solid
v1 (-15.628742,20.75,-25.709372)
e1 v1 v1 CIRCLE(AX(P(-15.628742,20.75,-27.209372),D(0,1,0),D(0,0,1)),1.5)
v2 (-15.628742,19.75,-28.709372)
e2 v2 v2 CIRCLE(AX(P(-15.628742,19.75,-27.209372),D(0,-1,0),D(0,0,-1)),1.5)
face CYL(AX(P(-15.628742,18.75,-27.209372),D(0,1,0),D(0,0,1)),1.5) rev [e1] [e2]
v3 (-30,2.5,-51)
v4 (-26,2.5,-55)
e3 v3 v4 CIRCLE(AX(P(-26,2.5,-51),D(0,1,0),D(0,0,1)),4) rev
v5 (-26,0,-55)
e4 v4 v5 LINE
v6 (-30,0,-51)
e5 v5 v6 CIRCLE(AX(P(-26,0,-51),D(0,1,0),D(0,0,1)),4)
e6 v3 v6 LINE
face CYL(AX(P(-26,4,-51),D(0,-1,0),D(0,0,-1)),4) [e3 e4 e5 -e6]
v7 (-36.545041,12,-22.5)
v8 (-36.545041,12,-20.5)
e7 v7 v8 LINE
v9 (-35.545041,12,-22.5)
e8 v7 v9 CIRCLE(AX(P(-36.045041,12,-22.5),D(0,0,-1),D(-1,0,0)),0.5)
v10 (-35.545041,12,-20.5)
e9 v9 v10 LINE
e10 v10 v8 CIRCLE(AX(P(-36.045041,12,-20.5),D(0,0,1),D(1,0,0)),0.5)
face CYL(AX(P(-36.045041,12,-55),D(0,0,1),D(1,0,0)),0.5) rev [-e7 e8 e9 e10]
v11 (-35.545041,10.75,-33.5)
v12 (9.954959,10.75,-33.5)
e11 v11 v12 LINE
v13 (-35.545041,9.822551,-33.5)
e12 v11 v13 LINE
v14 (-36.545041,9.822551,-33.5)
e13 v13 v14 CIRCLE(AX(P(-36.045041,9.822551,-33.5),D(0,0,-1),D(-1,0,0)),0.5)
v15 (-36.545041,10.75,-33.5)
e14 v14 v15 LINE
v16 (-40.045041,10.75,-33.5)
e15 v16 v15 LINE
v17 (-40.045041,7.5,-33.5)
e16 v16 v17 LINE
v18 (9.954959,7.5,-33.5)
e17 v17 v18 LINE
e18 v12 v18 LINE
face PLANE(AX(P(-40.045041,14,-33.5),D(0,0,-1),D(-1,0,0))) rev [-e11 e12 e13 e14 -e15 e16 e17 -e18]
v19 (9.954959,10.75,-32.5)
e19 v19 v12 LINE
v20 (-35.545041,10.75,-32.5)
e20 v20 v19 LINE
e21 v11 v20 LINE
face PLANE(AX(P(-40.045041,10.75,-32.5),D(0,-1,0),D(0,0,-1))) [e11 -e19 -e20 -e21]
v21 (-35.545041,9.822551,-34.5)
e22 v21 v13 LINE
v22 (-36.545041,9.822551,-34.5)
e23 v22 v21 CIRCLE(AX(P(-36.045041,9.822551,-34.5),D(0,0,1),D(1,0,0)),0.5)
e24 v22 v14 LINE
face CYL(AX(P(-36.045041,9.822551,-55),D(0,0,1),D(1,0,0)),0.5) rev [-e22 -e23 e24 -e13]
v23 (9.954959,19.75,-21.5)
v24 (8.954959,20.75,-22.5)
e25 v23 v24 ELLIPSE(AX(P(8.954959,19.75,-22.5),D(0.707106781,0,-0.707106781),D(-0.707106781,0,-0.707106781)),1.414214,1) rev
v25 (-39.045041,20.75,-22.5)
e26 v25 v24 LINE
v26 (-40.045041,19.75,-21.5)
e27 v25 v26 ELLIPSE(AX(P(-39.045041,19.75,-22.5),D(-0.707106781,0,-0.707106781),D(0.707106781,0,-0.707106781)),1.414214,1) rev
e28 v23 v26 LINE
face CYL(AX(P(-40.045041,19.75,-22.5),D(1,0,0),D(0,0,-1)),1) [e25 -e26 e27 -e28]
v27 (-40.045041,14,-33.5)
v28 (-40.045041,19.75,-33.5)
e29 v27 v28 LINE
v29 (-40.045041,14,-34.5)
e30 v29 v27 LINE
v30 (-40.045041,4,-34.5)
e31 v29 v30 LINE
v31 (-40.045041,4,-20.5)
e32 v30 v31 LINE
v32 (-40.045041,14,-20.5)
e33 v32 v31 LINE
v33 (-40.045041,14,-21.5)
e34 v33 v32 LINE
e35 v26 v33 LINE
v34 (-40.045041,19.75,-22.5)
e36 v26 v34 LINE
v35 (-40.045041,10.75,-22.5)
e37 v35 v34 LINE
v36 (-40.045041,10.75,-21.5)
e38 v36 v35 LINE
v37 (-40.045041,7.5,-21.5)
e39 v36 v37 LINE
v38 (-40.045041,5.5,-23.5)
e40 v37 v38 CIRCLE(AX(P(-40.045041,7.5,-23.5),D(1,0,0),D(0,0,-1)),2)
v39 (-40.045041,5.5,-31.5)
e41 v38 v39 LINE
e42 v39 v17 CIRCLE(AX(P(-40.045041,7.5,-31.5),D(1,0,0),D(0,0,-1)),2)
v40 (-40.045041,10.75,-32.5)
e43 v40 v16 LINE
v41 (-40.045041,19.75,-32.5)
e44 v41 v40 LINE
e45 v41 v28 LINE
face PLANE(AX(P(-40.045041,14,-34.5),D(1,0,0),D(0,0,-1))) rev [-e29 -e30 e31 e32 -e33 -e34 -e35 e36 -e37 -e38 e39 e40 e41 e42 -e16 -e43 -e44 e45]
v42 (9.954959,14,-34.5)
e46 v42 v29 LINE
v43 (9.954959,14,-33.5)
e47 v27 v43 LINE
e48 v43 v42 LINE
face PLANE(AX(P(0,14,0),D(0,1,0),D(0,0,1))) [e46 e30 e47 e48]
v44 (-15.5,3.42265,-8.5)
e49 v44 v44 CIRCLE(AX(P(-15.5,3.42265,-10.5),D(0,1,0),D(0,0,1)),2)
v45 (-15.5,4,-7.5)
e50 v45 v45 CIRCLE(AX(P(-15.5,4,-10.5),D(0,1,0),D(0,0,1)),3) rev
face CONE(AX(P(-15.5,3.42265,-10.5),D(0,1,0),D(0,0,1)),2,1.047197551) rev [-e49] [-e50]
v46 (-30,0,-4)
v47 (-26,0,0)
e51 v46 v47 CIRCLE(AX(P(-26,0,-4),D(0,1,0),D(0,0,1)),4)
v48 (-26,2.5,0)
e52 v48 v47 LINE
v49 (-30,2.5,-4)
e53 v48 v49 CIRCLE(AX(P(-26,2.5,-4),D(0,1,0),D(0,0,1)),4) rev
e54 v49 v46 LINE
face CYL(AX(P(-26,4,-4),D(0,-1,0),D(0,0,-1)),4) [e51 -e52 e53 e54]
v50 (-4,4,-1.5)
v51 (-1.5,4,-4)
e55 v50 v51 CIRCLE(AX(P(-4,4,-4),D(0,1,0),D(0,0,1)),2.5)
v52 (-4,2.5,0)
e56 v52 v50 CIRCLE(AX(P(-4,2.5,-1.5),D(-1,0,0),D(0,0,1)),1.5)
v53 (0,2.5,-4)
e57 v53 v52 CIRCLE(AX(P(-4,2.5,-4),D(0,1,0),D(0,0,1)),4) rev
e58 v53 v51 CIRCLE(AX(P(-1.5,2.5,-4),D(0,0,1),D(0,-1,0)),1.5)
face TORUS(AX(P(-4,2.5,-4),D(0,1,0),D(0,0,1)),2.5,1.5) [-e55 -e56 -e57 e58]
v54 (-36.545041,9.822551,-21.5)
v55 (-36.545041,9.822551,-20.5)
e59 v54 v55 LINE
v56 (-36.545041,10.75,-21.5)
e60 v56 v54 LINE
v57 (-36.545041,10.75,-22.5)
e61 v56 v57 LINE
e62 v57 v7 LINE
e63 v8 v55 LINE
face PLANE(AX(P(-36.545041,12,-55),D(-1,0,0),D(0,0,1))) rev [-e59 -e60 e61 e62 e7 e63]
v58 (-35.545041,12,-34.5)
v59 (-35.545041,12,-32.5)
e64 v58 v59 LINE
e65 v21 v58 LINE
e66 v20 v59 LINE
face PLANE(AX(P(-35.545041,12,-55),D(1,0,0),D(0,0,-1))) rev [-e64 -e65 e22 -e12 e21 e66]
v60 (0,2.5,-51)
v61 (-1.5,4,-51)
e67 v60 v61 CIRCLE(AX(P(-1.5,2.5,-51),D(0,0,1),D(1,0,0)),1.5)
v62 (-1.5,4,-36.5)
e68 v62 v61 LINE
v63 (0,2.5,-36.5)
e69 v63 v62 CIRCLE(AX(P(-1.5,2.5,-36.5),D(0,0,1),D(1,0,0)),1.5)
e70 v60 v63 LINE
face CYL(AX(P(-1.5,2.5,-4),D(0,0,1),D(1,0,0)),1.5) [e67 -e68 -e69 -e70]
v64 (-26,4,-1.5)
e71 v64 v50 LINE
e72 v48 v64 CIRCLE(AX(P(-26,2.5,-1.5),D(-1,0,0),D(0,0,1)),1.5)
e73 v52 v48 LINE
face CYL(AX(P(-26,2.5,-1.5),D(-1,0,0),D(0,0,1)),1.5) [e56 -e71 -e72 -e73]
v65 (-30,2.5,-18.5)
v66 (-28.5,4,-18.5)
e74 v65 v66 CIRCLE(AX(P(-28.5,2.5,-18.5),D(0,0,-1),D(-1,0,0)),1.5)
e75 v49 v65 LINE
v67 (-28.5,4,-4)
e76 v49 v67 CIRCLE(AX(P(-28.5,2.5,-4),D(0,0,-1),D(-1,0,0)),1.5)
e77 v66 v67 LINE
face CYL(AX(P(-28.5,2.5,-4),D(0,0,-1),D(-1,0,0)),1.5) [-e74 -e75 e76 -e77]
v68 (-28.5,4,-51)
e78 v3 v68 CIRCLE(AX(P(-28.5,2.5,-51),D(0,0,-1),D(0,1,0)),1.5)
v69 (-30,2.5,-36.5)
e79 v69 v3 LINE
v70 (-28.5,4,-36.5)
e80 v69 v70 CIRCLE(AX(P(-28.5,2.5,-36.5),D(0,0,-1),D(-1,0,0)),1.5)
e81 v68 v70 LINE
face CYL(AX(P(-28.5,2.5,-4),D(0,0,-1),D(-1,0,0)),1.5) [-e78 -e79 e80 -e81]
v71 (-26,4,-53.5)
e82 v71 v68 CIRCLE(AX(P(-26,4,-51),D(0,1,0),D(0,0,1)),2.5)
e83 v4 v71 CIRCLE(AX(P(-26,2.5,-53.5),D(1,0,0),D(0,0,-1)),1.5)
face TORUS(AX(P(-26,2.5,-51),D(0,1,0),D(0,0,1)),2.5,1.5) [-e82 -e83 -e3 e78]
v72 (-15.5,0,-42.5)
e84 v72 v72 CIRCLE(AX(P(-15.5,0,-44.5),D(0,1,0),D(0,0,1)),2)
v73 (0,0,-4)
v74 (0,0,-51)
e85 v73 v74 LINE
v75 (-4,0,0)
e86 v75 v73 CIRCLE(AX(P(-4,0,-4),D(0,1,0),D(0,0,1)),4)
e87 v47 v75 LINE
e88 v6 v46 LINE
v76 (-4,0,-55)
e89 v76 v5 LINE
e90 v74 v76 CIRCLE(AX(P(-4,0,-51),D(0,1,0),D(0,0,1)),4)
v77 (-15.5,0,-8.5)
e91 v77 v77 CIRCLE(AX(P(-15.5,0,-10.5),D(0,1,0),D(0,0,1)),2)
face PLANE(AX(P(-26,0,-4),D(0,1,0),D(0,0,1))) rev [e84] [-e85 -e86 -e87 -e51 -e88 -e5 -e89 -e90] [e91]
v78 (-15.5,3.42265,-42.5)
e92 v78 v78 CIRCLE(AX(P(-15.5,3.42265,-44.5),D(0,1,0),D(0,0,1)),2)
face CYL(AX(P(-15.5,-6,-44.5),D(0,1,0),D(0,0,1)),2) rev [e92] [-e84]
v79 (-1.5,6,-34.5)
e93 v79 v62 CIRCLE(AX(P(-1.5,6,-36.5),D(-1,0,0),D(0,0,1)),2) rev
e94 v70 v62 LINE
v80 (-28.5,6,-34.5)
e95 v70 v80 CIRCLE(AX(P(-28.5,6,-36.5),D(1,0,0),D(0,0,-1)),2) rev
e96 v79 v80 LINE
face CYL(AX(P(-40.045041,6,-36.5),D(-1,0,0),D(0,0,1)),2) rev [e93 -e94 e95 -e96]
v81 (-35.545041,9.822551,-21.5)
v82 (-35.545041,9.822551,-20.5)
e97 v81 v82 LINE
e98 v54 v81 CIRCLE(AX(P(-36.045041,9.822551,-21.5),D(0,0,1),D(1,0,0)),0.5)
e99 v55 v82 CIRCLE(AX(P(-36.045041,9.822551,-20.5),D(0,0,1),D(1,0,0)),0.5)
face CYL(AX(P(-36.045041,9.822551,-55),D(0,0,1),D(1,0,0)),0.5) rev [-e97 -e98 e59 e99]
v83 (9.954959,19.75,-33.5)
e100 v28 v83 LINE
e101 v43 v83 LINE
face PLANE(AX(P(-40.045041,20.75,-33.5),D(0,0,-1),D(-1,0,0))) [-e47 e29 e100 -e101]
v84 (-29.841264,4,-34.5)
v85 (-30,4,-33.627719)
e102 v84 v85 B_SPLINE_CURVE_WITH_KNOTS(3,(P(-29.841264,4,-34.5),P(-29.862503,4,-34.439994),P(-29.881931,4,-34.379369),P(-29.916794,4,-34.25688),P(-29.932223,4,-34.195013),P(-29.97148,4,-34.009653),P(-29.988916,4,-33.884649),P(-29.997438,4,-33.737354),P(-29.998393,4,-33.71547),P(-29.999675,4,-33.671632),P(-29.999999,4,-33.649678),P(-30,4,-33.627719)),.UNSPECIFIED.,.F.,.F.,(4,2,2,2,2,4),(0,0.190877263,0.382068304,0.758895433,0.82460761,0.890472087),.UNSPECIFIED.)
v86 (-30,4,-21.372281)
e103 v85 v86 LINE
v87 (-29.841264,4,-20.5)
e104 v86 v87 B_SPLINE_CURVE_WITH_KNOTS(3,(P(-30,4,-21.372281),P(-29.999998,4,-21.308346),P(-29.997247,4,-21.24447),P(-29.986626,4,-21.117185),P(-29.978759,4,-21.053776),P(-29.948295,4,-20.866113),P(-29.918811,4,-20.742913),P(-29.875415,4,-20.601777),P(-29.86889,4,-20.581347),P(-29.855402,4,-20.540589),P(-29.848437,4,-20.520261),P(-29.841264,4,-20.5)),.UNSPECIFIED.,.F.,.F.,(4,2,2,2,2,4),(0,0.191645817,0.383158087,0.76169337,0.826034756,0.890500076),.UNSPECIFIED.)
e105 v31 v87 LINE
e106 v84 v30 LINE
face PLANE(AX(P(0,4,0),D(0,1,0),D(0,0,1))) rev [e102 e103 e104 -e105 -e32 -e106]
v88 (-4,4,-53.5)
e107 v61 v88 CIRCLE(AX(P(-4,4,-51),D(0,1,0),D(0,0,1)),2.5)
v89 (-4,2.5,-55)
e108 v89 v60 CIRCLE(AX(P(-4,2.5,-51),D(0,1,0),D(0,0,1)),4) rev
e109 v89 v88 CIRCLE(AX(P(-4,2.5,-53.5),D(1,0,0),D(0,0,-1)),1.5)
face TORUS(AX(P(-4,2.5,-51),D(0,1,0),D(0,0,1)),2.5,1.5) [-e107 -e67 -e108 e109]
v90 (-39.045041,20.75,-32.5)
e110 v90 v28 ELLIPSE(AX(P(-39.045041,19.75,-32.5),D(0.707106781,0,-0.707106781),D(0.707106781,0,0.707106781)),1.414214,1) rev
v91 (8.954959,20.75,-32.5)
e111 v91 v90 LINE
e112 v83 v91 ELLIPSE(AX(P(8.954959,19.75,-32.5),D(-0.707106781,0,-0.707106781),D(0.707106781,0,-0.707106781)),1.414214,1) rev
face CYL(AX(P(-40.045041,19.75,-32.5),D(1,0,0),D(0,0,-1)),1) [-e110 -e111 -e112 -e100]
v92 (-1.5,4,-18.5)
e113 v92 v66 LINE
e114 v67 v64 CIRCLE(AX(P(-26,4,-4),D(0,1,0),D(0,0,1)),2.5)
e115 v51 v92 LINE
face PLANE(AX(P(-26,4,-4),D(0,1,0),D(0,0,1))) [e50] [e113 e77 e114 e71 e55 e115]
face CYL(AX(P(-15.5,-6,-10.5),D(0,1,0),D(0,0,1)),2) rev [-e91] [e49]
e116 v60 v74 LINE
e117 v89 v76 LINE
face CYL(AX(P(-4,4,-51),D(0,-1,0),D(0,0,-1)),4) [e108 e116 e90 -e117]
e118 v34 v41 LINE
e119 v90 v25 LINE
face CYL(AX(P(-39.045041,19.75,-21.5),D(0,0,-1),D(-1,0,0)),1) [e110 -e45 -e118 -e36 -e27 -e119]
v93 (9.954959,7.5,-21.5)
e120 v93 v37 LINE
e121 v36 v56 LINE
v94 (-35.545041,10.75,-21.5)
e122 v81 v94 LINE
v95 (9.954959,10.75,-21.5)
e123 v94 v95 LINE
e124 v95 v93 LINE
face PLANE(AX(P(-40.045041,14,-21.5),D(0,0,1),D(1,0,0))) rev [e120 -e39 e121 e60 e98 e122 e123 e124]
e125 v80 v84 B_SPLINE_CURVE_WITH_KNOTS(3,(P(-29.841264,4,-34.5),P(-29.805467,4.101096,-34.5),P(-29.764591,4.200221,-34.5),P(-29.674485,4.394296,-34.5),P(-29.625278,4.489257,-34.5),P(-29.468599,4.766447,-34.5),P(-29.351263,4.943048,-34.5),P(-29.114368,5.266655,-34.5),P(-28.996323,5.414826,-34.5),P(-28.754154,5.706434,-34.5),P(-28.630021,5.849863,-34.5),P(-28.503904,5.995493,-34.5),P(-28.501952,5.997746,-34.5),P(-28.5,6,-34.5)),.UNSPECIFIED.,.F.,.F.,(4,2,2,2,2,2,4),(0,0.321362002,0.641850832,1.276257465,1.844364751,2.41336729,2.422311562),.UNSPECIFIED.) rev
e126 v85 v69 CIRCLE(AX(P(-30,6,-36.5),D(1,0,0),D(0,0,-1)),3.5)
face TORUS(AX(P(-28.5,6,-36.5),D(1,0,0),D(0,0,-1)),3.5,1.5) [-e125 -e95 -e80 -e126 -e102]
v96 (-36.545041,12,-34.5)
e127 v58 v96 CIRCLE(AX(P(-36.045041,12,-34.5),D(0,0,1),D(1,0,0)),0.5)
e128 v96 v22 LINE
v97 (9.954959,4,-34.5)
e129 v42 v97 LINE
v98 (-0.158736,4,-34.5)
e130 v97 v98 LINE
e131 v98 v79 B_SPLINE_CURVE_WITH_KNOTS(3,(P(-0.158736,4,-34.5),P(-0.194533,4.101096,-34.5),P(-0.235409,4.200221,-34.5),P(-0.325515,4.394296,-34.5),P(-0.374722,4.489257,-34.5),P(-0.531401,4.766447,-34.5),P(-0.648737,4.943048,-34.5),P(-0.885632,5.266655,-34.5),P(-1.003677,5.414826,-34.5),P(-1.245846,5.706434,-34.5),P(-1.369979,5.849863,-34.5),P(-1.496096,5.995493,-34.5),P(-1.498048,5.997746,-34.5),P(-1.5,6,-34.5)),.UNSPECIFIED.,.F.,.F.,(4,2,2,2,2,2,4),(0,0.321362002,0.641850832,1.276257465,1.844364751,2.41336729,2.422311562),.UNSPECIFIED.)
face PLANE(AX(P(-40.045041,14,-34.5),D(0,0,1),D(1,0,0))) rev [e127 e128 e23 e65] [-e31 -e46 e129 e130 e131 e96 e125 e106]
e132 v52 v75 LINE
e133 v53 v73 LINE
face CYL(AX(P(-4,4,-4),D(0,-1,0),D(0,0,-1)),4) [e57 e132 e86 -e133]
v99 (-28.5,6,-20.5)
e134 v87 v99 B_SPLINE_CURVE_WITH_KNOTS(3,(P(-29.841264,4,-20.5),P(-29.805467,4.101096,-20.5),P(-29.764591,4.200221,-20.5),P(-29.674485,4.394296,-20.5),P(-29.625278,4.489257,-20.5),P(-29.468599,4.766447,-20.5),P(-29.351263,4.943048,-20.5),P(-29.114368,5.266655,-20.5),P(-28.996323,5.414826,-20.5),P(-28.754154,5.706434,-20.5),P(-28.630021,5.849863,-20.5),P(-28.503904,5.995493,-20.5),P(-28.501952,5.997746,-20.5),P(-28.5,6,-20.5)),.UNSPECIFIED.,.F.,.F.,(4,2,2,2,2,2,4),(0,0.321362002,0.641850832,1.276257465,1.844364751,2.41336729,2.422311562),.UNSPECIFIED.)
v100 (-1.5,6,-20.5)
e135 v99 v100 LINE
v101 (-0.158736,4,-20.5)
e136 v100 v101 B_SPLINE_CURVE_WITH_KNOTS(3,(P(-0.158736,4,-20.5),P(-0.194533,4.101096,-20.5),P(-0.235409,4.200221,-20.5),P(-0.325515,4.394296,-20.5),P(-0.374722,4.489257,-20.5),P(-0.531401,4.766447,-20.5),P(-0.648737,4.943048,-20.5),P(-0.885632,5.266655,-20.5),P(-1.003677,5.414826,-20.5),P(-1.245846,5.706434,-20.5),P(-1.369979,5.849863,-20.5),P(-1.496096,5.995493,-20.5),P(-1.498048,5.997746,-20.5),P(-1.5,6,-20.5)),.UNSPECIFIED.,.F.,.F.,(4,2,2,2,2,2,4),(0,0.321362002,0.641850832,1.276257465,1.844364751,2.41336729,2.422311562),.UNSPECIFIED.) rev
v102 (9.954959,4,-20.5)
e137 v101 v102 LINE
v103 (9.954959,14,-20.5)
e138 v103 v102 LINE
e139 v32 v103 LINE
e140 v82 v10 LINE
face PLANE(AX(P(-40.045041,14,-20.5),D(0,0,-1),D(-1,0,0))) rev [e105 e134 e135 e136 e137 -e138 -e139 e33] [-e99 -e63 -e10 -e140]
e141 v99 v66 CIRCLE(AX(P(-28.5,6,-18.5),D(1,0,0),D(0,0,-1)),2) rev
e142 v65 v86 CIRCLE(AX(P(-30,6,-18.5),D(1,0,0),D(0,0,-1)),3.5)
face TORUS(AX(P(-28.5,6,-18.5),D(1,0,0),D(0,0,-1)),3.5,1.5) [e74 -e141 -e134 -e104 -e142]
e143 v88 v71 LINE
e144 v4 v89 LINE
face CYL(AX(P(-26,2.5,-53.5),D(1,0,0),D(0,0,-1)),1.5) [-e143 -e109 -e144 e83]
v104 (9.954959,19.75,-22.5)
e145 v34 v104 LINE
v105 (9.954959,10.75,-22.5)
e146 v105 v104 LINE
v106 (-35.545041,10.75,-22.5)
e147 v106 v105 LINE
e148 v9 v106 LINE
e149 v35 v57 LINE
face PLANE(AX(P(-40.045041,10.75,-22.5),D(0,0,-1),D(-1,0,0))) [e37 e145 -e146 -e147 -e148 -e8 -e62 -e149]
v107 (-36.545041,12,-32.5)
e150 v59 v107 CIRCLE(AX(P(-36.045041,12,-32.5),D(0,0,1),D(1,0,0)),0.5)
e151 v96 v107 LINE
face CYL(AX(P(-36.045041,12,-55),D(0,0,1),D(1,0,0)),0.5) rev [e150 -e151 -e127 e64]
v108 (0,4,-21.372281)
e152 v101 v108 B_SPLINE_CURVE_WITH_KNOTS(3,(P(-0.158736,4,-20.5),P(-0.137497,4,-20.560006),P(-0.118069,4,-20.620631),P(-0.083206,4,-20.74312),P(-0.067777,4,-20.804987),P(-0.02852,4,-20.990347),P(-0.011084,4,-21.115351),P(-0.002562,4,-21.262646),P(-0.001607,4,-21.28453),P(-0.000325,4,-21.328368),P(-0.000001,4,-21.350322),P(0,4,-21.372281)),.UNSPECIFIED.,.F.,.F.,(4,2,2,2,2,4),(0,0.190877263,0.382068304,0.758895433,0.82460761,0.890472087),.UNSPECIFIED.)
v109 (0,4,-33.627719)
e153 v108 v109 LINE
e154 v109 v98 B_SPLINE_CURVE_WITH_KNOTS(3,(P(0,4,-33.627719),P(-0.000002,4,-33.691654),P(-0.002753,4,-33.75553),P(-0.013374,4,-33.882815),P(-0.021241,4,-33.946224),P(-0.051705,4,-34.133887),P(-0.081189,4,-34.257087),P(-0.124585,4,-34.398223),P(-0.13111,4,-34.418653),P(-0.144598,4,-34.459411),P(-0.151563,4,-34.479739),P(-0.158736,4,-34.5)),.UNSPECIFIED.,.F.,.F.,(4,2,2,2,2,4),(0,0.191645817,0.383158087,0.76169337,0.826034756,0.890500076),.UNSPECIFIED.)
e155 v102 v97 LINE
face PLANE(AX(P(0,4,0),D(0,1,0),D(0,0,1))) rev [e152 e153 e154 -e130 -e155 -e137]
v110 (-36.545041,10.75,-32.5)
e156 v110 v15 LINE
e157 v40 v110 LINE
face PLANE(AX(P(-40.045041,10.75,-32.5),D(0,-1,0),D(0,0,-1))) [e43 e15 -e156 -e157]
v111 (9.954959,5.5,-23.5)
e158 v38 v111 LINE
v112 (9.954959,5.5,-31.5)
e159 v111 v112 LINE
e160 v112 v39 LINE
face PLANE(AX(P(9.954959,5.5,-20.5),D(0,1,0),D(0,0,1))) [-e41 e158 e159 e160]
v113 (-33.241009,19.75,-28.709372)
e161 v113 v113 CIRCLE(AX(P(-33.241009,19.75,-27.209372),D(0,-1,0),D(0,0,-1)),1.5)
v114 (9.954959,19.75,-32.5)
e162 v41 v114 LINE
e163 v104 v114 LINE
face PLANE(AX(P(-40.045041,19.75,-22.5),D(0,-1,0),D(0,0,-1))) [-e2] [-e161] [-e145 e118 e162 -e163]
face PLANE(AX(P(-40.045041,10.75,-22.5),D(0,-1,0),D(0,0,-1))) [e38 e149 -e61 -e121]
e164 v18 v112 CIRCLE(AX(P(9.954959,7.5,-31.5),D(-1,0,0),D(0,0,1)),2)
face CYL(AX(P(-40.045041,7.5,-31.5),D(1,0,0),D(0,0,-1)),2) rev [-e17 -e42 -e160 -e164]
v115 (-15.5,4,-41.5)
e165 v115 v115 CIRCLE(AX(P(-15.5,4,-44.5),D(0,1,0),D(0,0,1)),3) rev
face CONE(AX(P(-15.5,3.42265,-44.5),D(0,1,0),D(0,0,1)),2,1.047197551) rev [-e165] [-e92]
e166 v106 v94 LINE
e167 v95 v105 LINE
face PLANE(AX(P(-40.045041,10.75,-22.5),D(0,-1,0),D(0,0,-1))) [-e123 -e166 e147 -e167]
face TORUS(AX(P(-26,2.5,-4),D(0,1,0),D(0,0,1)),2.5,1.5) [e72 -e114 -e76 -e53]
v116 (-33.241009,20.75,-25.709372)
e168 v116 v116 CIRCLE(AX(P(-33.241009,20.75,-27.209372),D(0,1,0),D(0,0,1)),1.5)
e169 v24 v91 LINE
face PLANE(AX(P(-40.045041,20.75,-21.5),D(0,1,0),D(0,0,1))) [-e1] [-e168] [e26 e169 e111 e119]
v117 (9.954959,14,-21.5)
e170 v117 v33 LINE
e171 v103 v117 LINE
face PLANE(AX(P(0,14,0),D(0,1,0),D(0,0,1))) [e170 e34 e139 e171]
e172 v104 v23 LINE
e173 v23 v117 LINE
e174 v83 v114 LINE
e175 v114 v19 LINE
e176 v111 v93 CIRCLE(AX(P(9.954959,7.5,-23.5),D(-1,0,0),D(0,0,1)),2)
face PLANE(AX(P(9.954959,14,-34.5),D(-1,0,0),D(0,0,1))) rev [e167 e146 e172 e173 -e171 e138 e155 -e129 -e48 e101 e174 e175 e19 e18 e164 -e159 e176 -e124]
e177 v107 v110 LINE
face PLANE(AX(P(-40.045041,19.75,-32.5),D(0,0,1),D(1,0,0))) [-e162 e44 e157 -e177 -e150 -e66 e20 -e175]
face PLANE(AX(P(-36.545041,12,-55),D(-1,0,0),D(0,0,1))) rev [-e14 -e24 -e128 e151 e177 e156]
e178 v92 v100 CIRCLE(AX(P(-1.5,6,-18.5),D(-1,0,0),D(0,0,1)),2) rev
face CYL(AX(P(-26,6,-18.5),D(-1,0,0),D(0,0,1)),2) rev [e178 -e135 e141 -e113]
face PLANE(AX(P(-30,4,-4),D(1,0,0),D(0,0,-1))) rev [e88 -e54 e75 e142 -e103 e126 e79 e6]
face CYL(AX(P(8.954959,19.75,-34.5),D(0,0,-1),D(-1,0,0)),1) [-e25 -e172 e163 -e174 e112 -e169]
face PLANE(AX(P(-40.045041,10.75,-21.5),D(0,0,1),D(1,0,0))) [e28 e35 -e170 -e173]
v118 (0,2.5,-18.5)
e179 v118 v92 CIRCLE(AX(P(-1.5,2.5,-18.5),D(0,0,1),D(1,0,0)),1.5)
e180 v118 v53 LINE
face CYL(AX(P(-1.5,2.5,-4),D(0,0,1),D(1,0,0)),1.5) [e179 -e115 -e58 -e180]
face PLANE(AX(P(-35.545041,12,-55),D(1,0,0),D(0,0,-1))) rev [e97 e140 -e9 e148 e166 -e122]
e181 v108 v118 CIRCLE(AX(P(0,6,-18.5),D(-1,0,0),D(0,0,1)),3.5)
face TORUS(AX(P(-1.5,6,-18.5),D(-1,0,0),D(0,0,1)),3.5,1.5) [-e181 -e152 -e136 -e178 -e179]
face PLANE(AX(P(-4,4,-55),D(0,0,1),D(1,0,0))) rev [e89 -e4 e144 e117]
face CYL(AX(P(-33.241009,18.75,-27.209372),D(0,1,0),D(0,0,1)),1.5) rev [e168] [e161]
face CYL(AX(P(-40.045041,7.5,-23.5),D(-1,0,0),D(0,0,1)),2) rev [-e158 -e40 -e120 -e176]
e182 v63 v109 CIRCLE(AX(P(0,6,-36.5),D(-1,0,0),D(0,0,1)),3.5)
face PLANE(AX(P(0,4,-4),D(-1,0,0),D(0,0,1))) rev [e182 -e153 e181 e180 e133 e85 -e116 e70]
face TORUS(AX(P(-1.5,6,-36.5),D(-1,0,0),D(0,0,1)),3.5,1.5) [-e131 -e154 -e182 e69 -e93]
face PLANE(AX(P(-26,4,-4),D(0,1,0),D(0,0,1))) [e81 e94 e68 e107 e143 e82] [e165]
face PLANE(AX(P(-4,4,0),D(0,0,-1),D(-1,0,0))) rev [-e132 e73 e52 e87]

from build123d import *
from OCP.BRepFilletAPI import BRepFilletAPI_MakeChamfer

# Parameters (mm, degrees)
BOSS_EXTRUDE1_DEPTH = 4
SKETCH3_W           = 50
SKETCH3_H           = 1
BOSS_EXTRUDE2_DEPTH = 10
BOSS_EXTRUDE3_START = -13
SKETCH4_W           = 50
SKETCH4_H           = 1.5
BOSS_EXTRUDE3_DEPTH = 12
FILLET1_R           = 2
FILLET2_R           = 2
FILLET3_R           = 2
FILLET4_R           = 1.5
BOSS_EXTRUDE4_DEPTH = 50
FILLET6_START       = -40.045040573
FILLET6_DEPTH       = 50
FILLET6_START_2     = -34.5
FILLET6_2_DEPTH     = 14
SKETCH6_R           = 1.5
CUT_EXTRUDE1_DEPTH  = 2
SKETCH8_R           = 2
CUT_EXTRUDE2_DEPTH  = 10
CHAMFER1_SIZE       = 1
CHAMFER1_SIZE2      = 0.577350269
CUT_EXTRUDE3_DEPTH  = 57.783957087


with BuildPart() as part:
    # Sketch1 → Boss-Extrude1 (new body)
    with BuildSketch(Plane(origin=(0, 0, 0), x_dir=(1, 0, 0), z_dir=(0, 1, 0))):
        with BuildLine():
            Line((-4, 0), (-26, 0))
            ThreePointArc((-26, 0), (-28.828427125, 1.171572875), (-30, 4))
            Line((-30, 4), (-30, 51))
            ThreePointArc((-30, 51), (-28.828427125, 53.828427125), (-26, 55))
            Line((-26, 55), (-4, 55))
            ThreePointArc((-4, 55), (-1.171572875, 53.828427125), (0, 51))
            Line((0, 51), (0, 4))
            ThreePointArc((0, 4), (-1.171572875, 1.171572875), (-4, 0))
        make_face()
    extrude(amount=BOSS_EXTRUDE1_DEPTH)

    # Sketch3 → Boss-Extrude2 (add)
    with BuildSketch(Plane(origin=(0, 4, 0), x_dir=(1, 0, 0), z_dir=(0, 1, 0))):
        with Locations((-15.045040573, 21)):
            Rectangle(SKETCH3_W, SKETCH3_H)
        with Locations((-15.045040573, 34)):
            Rectangle(SKETCH3_W, SKETCH3_H)
    extrude(amount=BOSS_EXTRUDE2_DEPTH)

    # Sketch4 → Boss-Extrude3 (add)
    with BuildSketch(Plane(origin=(0, 0, -34.5), x_dir=(-1, 0, 0), z_dir=(0, 0, -1)).offset(BOSS_EXTRUDE3_START)):
        with Locations((15.045040573, 4.75)):
            Rectangle(SKETCH4_W, SKETCH4_H)
    extrude(amount=BOSS_EXTRUDE3_DEPTH)

    # Fillet1
    fillet1_edges = [part.edges().sort_by_distance(p)[0] for p in [
        (-15, 4, -20.5),
    ]]
    fillet(fillet1_edges, radius=FILLET1_R)

    # Fillet2
    fillet2_edges = [part.edges().sort_by_distance(p)[0] for p in [
        (-15, 4, -34.5),
    ]]
    fillet(fillet2_edges, radius=FILLET2_R)

    # Fillet3
    fillet3_edges = [part.edges().sort_by_distance(p)[0] for p in [
        (-15.045040573, 5.5, -33.5),
        (-15.045040573, 5.5, -21.5),
    ]]
    fillet(fillet3_edges, radius=FILLET3_R)

    # Fillet4
    # the kernel refuses this fillet: 1.5 mm, written as the material it takes off along each edge
    with BuildSketch(Plane(origin=(0, 6, -36.5), x_dir=(0, -1, 0), z_dir=(0, 0, -1))) as fillet4_piece_1_section:
        with BuildLine():
            CenterArc((2 + FILLET4_R, FILLET4_R), FILLET4_R, 180, 90)
            Line((2 + FILLET4_R, 0), (2, 0))
            Line((2, 0), (2, FILLET4_R))
        make_face()
    fillet4_piece_1 = revolve(axis=Axis((0, 6, -36.5), (-1, 0, 0)), revolution_arc=197.472741928, mode=Mode.PRIVATE)
    fillet4_piece_1 = split(fillet4_piece_1, bisect_by=Plane(origin=(0, 6, -34.5), z_dir=(0, 0, -1)), keep=Keep.TOP, mode=Mode.PRIVATE)
    add(fillet4_piece_1, mode=Mode.SUBTRACT)
    with BuildSketch(Plane(origin=(0, 6, -36.5), x_dir=(0, -1, 0), z_dir=(0, 0, -1))) as fillet4_piece_2_section:
        with BuildLine():
            CenterArc((2 + FILLET4_R, FILLET4_R), FILLET4_R, 180, 90)
            Line((2 + FILLET4_R, 0), (2, 0))
            Line((2, 0), (2, FILLET4_R))
        make_face()
    fillet4_piece_2 = revolve(axis=Axis((0, 6, -36.5), (-1, 0, 0)), revolution_arc=197.472741928, mode=Mode.PRIVATE)
    fillet4_piece_2 = split(fillet4_piece_2, bisect_by=Plane(origin=(0, 4, -36.5), z_dir=(0, -1, 0)), keep=Keep.TOP, mode=Mode.PRIVATE)
    add(fillet4_piece_2, mode=Mode.SUBTRACT)
    with BuildSketch(Plane(origin=(-30, 6, -36.5), x_dir=(0, -1, 0), z_dir=(0, 0, -1))) as fillet4_piece_3_section:
        with BuildLine():
            CenterArc((2 + FILLET4_R, -FILLET4_R), FILLET4_R, 90, 90)
            Line((2, -FILLET4_R), (2, 0))
            Line((2, 0), (2 + FILLET4_R, 0))
        make_face()
    fillet4_piece_3 = revolve(axis=Axis((-30, 6, -36.5), (-1, 0, 0)), revolution_arc=197.472741928, mode=Mode.PRIVATE)
    fillet4_piece_3 = split(fillet4_piece_3, bisect_by=Plane(origin=(-30, 4, -36.5), z_dir=(0, -1, 0)), keep=Keep.TOP, mode=Mode.PRIVATE)
    add(fillet4_piece_3, mode=Mode.SUBTRACT)
    with BuildSketch(Plane(origin=(-30, 6, -36.5), x_dir=(0, -1, 0), z_dir=(0, 0, -1))) as fillet4_piece_4_section:
        with BuildLine():
            CenterArc((2 + FILLET4_R, -FILLET4_R), FILLET4_R, 90, 90)
            Line((2, -FILLET4_R), (2, 0))
            Line((2, 0), (2 + FILLET4_R, 0))
        make_face()
    fillet4_piece_4 = revolve(axis=Axis((-30, 6, -36.5), (-1, 0, 0)), revolution_arc=197.472741928, mode=Mode.PRIVATE)
    fillet4_piece_4 = split(fillet4_piece_4, bisect_by=Plane(origin=(-30, 6, -34.5), z_dir=(0, 0, -1)), keep=Keep.TOP, mode=Mode.PRIVATE)
    add(fillet4_piece_4, mode=Mode.SUBTRACT)
    with BuildSketch(Plane(origin=(-30, 6, -18.5), x_dir=(0, 0.9538599015249878, 0.30025204122993193), z_dir=(0, -0.30025204122993193, 0.9538599015249878))) as fillet4_piece_5_section:
        with BuildLine():
            CenterArc((2 + FILLET4_R, -FILLET4_R), FILLET4_R, 90, 90)
            Line((2, -FILLET4_R), (2, 0))
            Line((2, 0), (2 + FILLET4_R, 0))
        make_face()
    fillet4_piece_5 = revolve(axis=Axis((-30, 6, -18.5), (-1, 0, 0)), revolution_arc=197.472741928, mode=Mode.PRIVATE)
    fillet4_piece_5 = split(fillet4_piece_5, bisect_by=Plane(origin=(-30, 6, -20.5), z_dir=(0, 0, 1)), keep=Keep.TOP, mode=Mode.PRIVATE)
    add(fillet4_piece_5, mode=Mode.SUBTRACT)
    with BuildSketch(Plane(origin=(-30, 6, -18.5), x_dir=(0, 0.9538599015249878, 0.30025204122993193), z_dir=(0, -0.30025204122993193, 0.9538599015249878))) as fillet4_piece_6_section:
        with BuildLine():
            CenterArc((2 + FILLET4_R, -FILLET4_R), FILLET4_R, 90, 90)
            Line((2, -FILLET4_R), (2, 0))
            Line((2, 0), (2 + FILLET4_R, 0))
        make_face()
    fillet4_piece_6 = revolve(axis=Axis((-30, 6, -18.5), (-1, 0, 0)), revolution_arc=197.472741928, mode=Mode.PRIVATE)
    fillet4_piece_6 = split(fillet4_piece_6, bisect_by=Plane(origin=(-30, 4, -18.5), z_dir=(0, -1, 0)), keep=Keep.TOP, mode=Mode.PRIVATE)
    add(fillet4_piece_6, mode=Mode.SUBTRACT)
    with BuildSketch(Plane(origin=(0, 6, -18.5), x_dir=(0, 0.9538599015249878, 0.3002520412299318), z_dir=(0, -0.3002520412299318, 0.9538599015249878))) as fillet4_piece_7_section:
        with BuildLine():
            CenterArc((2 + FILLET4_R, FILLET4_R), FILLET4_R, 180, 90)
            Line((2, FILLET4_R), (2, 0))
            Line((2, 0), (2 + FILLET4_R, 0))
        make_face()
    fillet4_piece_7 = revolve(axis=Axis((0, 6, -18.5), (-1, 0, 0)), revolution_arc=197.472741928, mode=Mode.PRIVATE)
    fillet4_piece_7 = split(fillet4_piece_7, bisect_by=Plane(origin=(0, 6, -20.5), z_dir=(0, 0, 1)), keep=Keep.TOP, mode=Mode.PRIVATE)
    add(fillet4_piece_7, mode=Mode.SUBTRACT)
    with BuildSketch(Plane(origin=(0, 6, -18.5), x_dir=(0, 0.9538599015249878, 0.3002520412299318), z_dir=(0, -0.3002520412299318, 0.9538599015249878))) as fillet4_piece_8_section:
        with BuildLine():
            CenterArc((2 + FILLET4_R, FILLET4_R), FILLET4_R, 180, 90)
            Line((2, FILLET4_R), (2, 0))
            Line((2, 0), (2 + FILLET4_R, 0))
        make_face()
    fillet4_piece_8 = revolve(axis=Axis((0, 6, -18.5), (-1, 0, 0)), revolution_arc=197.472741928, mode=Mode.PRIVATE)
    fillet4_piece_8 = split(fillet4_piece_8, bisect_by=Plane(origin=(0, 4, -18.5), z_dir=(0, -1, 0)), keep=Keep.TOP, mode=Mode.PRIVATE)
    add(fillet4_piece_8, mode=Mode.SUBTRACT)
    with BuildSketch(Plane(origin=(-26, 4, -51), x_dir=(-1, 0, 0), z_dir=(0, 0, 1))) as fillet4_piece_9:
        with BuildLine():
            CenterArc((4 - FILLET4_R, FILLET4_R), FILLET4_R, 270, 90)
            Line((4, FILLET4_R), (4, 0))
            Line((4, 0), (4 - FILLET4_R, 0))
        make_face()
    revolve(axis=Axis((-26, 4, -51), (0, -1, 0)), revolution_arc=90, mode=Mode.SUBTRACT)
    with BuildSketch(Plane(origin=(-26, 4, -55), x_dir=(0, 0, 1), z_dir=(1, 0, 0)), Plane(origin=(-4, 4, 0), x_dir=(0, 0, -1), z_dir=(-1, 0, 0))) as fillet4_piece_10:
        with BuildLine():
            CenterArc((FILLET4_R, FILLET4_R), FILLET4_R, 180, 90)
            Line((0, FILLET4_R), (0, 0))
            Line((0, 0), (FILLET4_R, 0))
        make_face()
    extrude(amount=22, mode=Mode.SUBTRACT)
    with BuildSketch(Plane(origin=(-4, 4, -51), x_dir=(0, 0, -1), z_dir=(-1, 0, 0))) as fillet4_piece_11:
        with BuildLine():
            CenterArc((4 - FILLET4_R, FILLET4_R), FILLET4_R, 270, 90)
            Line((4, FILLET4_R), (4, 0))
            Line((4, 0), (4 - FILLET4_R, 0))
        make_face()
    revolve(axis=Axis((-4, 4, -51), (0, -1, 0)), revolution_arc=90, mode=Mode.SUBTRACT)
    with BuildSketch(Plane(origin=(0, 4, -51), x_dir=(0, -1, 0), z_dir=(0, 0, 1)), Plane(origin=(-30, 4, -36.5), x_dir=(0, -1, 0), z_dir=(0, 0, -1)), Plane(origin=(-30, 4, -4), x_dir=(0, -1, 0), z_dir=(0, 0, -1)), Plane(origin=(0, 4, -18.5), x_dir=(0, -1, 0), z_dir=(0, 0, 1))) as fillet4_piece_12:
        with BuildLine():
            CenterArc((FILLET4_R, -FILLET4_R), FILLET4_R, 90, 90)
            Line((0, -FILLET4_R), (0, 0))
            Line((0, 0), (FILLET4_R, 0))
        make_face()
    extrude(amount=14.5, mode=Mode.SUBTRACT)
    with BuildSketch(Plane(origin=(-4, 4, -4), x_dir=(1, 0, 0), z_dir=(0, 0, -1))) as fillet4_piece_13:
        with BuildLine():
            CenterArc((4 - FILLET4_R, FILLET4_R), FILLET4_R, 270, 90)
            Line((4, FILLET4_R), (4, 0))
            Line((4, 0), (4 - FILLET4_R, 0))
        make_face()
    revolve(axis=Axis((-4, 4, -4), (0, -1, 0)), revolution_arc=90, mode=Mode.SUBTRACT)
    with BuildSketch(Plane(origin=(-26, 4, -4), x_dir=(0, 0, 1), z_dir=(1, 0, 0))) as fillet4_piece_14:
        with BuildLine():
            CenterArc((4 - FILLET4_R, FILLET4_R), FILLET4_R, 270, 90)
            Line((4 - FILLET4_R, 0), (4, 0))
            Line((4, 0), (4, FILLET4_R))
        make_face()
    revolve(axis=Axis((-26, 4, -4), (0, -1, 0)), revolution_arc=90, mode=Mode.SUBTRACT)

    # Sketch5 → Boss-Extrude4 (add)
    with BuildSketch(Plane(origin=(9.954959427, 0, 0), x_dir=(0, 0, -1), z_dir=(1, 0, 0))):
        Polygon((21.5, 10.75), (21.5, 20.75), (33.5, 20.75), (33.5, 10.75), (32.5, 10.75), (32.5, 19.75), (22.5, 19.75), (22.5, 10.75), align=None)
    extrude(amount=-BOSS_EXTRUDE4_DEPTH)

    # Fillet6: read off the stored shape, not the designer's step
    # Fillet6 outline → Fillet6 (cut)
    with BuildSketch(Plane.YZ.offset(FILLET6_START)):
        with BuildLine():
            ThreePointArc((19.75, -21.5), (20.457106781, -21.792893219), (20.75, -22.5))
            Line((20.75, -22.5), (20.75, -21.5))
            Line((20.75, -21.5), (19.75, -21.5))
        make_face()
        with BuildLine():
            ThreePointArc((20.75, -32.5), (20.457106781, -33.207106781), (19.75, -33.5))
            Line((19.75, -33.5), (20.75, -33.5))
            Line((20.75, -33.5), (20.75, -32.5))
        make_face()
    extrude(amount=FILLET6_DEPTH, mode=Mode.SUBTRACT)

    # Fillet6 2 outline → Fillet6 2 (cut)
    with BuildSketch(Plane.XY.offset(FILLET6_START_2)):
        with BuildLine():
            Line((-40.045040573, 20.75), (-40.045040573, 19.75))
            ThreePointArc((-40.045040573, 19.75), (-39.752147354, 20.457106781), (-39.045040573, 20.75))
            Line((-39.045040573, 20.75), (-40.045040573, 20.75))
        make_face()
        with BuildLine():
            Line((9.954959427, 20.75), (8.954959427, 20.75))
            ThreePointArc((8.954959427, 20.75), (9.662066208, 20.457106781), (9.954959427, 19.75))
            Line((9.954959427, 19.75), (9.954959427, 20.75))
        make_face()
    extrude(amount=FILLET6_2_DEPTH, mode=Mode.SUBTRACT)

    # Sketch6 → Cut-Extrude1 (cut)
    with BuildSketch(Plane(origin=(0, 20.75, 0), x_dir=(1, 0, 0), z_dir=(0, 1, 0))):
        with Locations(Location((-15.628742291, 27.209372309, 0), (0, 0, 270))):
            Circle(SKETCH6_R)
        with Locations(Location((-33.241009351, 27.209372309, 0), (0, 0, 270))):
            Circle(SKETCH6_R)
    extrude(amount=-CUT_EXTRUDE1_DEPTH, mode=Mode.SUBTRACT)

    # Sketch8 → Cut-Extrude2 (cut)
    with BuildSketch(Plane(origin=(0, 4, 0), x_dir=(1, 0, 0), z_dir=(0, 1, 0))):
        with Locations(Location((-15.5, 10.5, 0), (0, 0, 270))):
            Circle(SKETCH8_R)
        with Locations(Location((-15.5, 44.5, 0), (0, 0, 270))):
            Circle(SKETCH8_R)
    extrude(amount=-CUT_EXTRUDE2_DEPTH, mode=Mode.SUBTRACT)

    # Chamfer1: one chamfer whose edges measure the first distance from different faces: ONE call of the kernel's chamfer builder (chamfer() names one face for all edges)
    chamfer1_edges_1 = [part.edges().sort_by_distance(p)[0] for p in [
        (-15.5, 4, -12.5),
    ]]
    chamfer1_side_1 = [part.faces().sort_by_distance(p)[0] for p in [
        (-15, 4, -1.819061123),
    ]]
    chamfer1_edges_2 = [part.edges().sort_by_distance(p)[0] for p in [
        (-15.5, 4, -46.5),
    ]]
    chamfer1_side_2 = [part.faces().sort_by_distance(p)[0] for p in [
        (-15, 4, -36.819061123),
    ]]
    chamfer1 = BRepFilletAPI_MakeChamfer(part.part.solid().wrapped)
    for e in chamfer1_edges_1:
        chamfer1.Add(CHAMFER1_SIZE, CHAMFER1_SIZE2, e.wrapped, chamfer1_side_1[0].wrapped)  # the first distance lies on this face
    for e in chamfer1_edges_2:
        chamfer1.Add(CHAMFER1_SIZE, CHAMFER1_SIZE2, e.wrapped, chamfer1_side_2[0].wrapped)  # the first distance lies on this face
    add(Compound.cast(chamfer1.Shape()), mode=Mode.REPLACE)

    # Sketch9 → Cut-Extrude3 (cut, through all)
    with BuildSketch(Plane.XY.offset(-20.5)):
        with BuildLine():
            Line((-35.545040573, 12), (-35.545040573, 9.822550729))
            ThreePointArc((-35.545040573, 9.822550729), (-36.045040573, 9.322550729), (-36.545040573, 9.822550729))
            Line((-36.545040573, 9.822550729), (-36.545040573, 12))
            ThreePointArc((-36.545040573, 12), (-36.045040573, 12.5), (-35.545040573, 12))
        make_face()
    extrude(amount=-CUT_EXTRUDE3_DEPTH, mode=Mode.SUBTRACT)


solid = part.part
